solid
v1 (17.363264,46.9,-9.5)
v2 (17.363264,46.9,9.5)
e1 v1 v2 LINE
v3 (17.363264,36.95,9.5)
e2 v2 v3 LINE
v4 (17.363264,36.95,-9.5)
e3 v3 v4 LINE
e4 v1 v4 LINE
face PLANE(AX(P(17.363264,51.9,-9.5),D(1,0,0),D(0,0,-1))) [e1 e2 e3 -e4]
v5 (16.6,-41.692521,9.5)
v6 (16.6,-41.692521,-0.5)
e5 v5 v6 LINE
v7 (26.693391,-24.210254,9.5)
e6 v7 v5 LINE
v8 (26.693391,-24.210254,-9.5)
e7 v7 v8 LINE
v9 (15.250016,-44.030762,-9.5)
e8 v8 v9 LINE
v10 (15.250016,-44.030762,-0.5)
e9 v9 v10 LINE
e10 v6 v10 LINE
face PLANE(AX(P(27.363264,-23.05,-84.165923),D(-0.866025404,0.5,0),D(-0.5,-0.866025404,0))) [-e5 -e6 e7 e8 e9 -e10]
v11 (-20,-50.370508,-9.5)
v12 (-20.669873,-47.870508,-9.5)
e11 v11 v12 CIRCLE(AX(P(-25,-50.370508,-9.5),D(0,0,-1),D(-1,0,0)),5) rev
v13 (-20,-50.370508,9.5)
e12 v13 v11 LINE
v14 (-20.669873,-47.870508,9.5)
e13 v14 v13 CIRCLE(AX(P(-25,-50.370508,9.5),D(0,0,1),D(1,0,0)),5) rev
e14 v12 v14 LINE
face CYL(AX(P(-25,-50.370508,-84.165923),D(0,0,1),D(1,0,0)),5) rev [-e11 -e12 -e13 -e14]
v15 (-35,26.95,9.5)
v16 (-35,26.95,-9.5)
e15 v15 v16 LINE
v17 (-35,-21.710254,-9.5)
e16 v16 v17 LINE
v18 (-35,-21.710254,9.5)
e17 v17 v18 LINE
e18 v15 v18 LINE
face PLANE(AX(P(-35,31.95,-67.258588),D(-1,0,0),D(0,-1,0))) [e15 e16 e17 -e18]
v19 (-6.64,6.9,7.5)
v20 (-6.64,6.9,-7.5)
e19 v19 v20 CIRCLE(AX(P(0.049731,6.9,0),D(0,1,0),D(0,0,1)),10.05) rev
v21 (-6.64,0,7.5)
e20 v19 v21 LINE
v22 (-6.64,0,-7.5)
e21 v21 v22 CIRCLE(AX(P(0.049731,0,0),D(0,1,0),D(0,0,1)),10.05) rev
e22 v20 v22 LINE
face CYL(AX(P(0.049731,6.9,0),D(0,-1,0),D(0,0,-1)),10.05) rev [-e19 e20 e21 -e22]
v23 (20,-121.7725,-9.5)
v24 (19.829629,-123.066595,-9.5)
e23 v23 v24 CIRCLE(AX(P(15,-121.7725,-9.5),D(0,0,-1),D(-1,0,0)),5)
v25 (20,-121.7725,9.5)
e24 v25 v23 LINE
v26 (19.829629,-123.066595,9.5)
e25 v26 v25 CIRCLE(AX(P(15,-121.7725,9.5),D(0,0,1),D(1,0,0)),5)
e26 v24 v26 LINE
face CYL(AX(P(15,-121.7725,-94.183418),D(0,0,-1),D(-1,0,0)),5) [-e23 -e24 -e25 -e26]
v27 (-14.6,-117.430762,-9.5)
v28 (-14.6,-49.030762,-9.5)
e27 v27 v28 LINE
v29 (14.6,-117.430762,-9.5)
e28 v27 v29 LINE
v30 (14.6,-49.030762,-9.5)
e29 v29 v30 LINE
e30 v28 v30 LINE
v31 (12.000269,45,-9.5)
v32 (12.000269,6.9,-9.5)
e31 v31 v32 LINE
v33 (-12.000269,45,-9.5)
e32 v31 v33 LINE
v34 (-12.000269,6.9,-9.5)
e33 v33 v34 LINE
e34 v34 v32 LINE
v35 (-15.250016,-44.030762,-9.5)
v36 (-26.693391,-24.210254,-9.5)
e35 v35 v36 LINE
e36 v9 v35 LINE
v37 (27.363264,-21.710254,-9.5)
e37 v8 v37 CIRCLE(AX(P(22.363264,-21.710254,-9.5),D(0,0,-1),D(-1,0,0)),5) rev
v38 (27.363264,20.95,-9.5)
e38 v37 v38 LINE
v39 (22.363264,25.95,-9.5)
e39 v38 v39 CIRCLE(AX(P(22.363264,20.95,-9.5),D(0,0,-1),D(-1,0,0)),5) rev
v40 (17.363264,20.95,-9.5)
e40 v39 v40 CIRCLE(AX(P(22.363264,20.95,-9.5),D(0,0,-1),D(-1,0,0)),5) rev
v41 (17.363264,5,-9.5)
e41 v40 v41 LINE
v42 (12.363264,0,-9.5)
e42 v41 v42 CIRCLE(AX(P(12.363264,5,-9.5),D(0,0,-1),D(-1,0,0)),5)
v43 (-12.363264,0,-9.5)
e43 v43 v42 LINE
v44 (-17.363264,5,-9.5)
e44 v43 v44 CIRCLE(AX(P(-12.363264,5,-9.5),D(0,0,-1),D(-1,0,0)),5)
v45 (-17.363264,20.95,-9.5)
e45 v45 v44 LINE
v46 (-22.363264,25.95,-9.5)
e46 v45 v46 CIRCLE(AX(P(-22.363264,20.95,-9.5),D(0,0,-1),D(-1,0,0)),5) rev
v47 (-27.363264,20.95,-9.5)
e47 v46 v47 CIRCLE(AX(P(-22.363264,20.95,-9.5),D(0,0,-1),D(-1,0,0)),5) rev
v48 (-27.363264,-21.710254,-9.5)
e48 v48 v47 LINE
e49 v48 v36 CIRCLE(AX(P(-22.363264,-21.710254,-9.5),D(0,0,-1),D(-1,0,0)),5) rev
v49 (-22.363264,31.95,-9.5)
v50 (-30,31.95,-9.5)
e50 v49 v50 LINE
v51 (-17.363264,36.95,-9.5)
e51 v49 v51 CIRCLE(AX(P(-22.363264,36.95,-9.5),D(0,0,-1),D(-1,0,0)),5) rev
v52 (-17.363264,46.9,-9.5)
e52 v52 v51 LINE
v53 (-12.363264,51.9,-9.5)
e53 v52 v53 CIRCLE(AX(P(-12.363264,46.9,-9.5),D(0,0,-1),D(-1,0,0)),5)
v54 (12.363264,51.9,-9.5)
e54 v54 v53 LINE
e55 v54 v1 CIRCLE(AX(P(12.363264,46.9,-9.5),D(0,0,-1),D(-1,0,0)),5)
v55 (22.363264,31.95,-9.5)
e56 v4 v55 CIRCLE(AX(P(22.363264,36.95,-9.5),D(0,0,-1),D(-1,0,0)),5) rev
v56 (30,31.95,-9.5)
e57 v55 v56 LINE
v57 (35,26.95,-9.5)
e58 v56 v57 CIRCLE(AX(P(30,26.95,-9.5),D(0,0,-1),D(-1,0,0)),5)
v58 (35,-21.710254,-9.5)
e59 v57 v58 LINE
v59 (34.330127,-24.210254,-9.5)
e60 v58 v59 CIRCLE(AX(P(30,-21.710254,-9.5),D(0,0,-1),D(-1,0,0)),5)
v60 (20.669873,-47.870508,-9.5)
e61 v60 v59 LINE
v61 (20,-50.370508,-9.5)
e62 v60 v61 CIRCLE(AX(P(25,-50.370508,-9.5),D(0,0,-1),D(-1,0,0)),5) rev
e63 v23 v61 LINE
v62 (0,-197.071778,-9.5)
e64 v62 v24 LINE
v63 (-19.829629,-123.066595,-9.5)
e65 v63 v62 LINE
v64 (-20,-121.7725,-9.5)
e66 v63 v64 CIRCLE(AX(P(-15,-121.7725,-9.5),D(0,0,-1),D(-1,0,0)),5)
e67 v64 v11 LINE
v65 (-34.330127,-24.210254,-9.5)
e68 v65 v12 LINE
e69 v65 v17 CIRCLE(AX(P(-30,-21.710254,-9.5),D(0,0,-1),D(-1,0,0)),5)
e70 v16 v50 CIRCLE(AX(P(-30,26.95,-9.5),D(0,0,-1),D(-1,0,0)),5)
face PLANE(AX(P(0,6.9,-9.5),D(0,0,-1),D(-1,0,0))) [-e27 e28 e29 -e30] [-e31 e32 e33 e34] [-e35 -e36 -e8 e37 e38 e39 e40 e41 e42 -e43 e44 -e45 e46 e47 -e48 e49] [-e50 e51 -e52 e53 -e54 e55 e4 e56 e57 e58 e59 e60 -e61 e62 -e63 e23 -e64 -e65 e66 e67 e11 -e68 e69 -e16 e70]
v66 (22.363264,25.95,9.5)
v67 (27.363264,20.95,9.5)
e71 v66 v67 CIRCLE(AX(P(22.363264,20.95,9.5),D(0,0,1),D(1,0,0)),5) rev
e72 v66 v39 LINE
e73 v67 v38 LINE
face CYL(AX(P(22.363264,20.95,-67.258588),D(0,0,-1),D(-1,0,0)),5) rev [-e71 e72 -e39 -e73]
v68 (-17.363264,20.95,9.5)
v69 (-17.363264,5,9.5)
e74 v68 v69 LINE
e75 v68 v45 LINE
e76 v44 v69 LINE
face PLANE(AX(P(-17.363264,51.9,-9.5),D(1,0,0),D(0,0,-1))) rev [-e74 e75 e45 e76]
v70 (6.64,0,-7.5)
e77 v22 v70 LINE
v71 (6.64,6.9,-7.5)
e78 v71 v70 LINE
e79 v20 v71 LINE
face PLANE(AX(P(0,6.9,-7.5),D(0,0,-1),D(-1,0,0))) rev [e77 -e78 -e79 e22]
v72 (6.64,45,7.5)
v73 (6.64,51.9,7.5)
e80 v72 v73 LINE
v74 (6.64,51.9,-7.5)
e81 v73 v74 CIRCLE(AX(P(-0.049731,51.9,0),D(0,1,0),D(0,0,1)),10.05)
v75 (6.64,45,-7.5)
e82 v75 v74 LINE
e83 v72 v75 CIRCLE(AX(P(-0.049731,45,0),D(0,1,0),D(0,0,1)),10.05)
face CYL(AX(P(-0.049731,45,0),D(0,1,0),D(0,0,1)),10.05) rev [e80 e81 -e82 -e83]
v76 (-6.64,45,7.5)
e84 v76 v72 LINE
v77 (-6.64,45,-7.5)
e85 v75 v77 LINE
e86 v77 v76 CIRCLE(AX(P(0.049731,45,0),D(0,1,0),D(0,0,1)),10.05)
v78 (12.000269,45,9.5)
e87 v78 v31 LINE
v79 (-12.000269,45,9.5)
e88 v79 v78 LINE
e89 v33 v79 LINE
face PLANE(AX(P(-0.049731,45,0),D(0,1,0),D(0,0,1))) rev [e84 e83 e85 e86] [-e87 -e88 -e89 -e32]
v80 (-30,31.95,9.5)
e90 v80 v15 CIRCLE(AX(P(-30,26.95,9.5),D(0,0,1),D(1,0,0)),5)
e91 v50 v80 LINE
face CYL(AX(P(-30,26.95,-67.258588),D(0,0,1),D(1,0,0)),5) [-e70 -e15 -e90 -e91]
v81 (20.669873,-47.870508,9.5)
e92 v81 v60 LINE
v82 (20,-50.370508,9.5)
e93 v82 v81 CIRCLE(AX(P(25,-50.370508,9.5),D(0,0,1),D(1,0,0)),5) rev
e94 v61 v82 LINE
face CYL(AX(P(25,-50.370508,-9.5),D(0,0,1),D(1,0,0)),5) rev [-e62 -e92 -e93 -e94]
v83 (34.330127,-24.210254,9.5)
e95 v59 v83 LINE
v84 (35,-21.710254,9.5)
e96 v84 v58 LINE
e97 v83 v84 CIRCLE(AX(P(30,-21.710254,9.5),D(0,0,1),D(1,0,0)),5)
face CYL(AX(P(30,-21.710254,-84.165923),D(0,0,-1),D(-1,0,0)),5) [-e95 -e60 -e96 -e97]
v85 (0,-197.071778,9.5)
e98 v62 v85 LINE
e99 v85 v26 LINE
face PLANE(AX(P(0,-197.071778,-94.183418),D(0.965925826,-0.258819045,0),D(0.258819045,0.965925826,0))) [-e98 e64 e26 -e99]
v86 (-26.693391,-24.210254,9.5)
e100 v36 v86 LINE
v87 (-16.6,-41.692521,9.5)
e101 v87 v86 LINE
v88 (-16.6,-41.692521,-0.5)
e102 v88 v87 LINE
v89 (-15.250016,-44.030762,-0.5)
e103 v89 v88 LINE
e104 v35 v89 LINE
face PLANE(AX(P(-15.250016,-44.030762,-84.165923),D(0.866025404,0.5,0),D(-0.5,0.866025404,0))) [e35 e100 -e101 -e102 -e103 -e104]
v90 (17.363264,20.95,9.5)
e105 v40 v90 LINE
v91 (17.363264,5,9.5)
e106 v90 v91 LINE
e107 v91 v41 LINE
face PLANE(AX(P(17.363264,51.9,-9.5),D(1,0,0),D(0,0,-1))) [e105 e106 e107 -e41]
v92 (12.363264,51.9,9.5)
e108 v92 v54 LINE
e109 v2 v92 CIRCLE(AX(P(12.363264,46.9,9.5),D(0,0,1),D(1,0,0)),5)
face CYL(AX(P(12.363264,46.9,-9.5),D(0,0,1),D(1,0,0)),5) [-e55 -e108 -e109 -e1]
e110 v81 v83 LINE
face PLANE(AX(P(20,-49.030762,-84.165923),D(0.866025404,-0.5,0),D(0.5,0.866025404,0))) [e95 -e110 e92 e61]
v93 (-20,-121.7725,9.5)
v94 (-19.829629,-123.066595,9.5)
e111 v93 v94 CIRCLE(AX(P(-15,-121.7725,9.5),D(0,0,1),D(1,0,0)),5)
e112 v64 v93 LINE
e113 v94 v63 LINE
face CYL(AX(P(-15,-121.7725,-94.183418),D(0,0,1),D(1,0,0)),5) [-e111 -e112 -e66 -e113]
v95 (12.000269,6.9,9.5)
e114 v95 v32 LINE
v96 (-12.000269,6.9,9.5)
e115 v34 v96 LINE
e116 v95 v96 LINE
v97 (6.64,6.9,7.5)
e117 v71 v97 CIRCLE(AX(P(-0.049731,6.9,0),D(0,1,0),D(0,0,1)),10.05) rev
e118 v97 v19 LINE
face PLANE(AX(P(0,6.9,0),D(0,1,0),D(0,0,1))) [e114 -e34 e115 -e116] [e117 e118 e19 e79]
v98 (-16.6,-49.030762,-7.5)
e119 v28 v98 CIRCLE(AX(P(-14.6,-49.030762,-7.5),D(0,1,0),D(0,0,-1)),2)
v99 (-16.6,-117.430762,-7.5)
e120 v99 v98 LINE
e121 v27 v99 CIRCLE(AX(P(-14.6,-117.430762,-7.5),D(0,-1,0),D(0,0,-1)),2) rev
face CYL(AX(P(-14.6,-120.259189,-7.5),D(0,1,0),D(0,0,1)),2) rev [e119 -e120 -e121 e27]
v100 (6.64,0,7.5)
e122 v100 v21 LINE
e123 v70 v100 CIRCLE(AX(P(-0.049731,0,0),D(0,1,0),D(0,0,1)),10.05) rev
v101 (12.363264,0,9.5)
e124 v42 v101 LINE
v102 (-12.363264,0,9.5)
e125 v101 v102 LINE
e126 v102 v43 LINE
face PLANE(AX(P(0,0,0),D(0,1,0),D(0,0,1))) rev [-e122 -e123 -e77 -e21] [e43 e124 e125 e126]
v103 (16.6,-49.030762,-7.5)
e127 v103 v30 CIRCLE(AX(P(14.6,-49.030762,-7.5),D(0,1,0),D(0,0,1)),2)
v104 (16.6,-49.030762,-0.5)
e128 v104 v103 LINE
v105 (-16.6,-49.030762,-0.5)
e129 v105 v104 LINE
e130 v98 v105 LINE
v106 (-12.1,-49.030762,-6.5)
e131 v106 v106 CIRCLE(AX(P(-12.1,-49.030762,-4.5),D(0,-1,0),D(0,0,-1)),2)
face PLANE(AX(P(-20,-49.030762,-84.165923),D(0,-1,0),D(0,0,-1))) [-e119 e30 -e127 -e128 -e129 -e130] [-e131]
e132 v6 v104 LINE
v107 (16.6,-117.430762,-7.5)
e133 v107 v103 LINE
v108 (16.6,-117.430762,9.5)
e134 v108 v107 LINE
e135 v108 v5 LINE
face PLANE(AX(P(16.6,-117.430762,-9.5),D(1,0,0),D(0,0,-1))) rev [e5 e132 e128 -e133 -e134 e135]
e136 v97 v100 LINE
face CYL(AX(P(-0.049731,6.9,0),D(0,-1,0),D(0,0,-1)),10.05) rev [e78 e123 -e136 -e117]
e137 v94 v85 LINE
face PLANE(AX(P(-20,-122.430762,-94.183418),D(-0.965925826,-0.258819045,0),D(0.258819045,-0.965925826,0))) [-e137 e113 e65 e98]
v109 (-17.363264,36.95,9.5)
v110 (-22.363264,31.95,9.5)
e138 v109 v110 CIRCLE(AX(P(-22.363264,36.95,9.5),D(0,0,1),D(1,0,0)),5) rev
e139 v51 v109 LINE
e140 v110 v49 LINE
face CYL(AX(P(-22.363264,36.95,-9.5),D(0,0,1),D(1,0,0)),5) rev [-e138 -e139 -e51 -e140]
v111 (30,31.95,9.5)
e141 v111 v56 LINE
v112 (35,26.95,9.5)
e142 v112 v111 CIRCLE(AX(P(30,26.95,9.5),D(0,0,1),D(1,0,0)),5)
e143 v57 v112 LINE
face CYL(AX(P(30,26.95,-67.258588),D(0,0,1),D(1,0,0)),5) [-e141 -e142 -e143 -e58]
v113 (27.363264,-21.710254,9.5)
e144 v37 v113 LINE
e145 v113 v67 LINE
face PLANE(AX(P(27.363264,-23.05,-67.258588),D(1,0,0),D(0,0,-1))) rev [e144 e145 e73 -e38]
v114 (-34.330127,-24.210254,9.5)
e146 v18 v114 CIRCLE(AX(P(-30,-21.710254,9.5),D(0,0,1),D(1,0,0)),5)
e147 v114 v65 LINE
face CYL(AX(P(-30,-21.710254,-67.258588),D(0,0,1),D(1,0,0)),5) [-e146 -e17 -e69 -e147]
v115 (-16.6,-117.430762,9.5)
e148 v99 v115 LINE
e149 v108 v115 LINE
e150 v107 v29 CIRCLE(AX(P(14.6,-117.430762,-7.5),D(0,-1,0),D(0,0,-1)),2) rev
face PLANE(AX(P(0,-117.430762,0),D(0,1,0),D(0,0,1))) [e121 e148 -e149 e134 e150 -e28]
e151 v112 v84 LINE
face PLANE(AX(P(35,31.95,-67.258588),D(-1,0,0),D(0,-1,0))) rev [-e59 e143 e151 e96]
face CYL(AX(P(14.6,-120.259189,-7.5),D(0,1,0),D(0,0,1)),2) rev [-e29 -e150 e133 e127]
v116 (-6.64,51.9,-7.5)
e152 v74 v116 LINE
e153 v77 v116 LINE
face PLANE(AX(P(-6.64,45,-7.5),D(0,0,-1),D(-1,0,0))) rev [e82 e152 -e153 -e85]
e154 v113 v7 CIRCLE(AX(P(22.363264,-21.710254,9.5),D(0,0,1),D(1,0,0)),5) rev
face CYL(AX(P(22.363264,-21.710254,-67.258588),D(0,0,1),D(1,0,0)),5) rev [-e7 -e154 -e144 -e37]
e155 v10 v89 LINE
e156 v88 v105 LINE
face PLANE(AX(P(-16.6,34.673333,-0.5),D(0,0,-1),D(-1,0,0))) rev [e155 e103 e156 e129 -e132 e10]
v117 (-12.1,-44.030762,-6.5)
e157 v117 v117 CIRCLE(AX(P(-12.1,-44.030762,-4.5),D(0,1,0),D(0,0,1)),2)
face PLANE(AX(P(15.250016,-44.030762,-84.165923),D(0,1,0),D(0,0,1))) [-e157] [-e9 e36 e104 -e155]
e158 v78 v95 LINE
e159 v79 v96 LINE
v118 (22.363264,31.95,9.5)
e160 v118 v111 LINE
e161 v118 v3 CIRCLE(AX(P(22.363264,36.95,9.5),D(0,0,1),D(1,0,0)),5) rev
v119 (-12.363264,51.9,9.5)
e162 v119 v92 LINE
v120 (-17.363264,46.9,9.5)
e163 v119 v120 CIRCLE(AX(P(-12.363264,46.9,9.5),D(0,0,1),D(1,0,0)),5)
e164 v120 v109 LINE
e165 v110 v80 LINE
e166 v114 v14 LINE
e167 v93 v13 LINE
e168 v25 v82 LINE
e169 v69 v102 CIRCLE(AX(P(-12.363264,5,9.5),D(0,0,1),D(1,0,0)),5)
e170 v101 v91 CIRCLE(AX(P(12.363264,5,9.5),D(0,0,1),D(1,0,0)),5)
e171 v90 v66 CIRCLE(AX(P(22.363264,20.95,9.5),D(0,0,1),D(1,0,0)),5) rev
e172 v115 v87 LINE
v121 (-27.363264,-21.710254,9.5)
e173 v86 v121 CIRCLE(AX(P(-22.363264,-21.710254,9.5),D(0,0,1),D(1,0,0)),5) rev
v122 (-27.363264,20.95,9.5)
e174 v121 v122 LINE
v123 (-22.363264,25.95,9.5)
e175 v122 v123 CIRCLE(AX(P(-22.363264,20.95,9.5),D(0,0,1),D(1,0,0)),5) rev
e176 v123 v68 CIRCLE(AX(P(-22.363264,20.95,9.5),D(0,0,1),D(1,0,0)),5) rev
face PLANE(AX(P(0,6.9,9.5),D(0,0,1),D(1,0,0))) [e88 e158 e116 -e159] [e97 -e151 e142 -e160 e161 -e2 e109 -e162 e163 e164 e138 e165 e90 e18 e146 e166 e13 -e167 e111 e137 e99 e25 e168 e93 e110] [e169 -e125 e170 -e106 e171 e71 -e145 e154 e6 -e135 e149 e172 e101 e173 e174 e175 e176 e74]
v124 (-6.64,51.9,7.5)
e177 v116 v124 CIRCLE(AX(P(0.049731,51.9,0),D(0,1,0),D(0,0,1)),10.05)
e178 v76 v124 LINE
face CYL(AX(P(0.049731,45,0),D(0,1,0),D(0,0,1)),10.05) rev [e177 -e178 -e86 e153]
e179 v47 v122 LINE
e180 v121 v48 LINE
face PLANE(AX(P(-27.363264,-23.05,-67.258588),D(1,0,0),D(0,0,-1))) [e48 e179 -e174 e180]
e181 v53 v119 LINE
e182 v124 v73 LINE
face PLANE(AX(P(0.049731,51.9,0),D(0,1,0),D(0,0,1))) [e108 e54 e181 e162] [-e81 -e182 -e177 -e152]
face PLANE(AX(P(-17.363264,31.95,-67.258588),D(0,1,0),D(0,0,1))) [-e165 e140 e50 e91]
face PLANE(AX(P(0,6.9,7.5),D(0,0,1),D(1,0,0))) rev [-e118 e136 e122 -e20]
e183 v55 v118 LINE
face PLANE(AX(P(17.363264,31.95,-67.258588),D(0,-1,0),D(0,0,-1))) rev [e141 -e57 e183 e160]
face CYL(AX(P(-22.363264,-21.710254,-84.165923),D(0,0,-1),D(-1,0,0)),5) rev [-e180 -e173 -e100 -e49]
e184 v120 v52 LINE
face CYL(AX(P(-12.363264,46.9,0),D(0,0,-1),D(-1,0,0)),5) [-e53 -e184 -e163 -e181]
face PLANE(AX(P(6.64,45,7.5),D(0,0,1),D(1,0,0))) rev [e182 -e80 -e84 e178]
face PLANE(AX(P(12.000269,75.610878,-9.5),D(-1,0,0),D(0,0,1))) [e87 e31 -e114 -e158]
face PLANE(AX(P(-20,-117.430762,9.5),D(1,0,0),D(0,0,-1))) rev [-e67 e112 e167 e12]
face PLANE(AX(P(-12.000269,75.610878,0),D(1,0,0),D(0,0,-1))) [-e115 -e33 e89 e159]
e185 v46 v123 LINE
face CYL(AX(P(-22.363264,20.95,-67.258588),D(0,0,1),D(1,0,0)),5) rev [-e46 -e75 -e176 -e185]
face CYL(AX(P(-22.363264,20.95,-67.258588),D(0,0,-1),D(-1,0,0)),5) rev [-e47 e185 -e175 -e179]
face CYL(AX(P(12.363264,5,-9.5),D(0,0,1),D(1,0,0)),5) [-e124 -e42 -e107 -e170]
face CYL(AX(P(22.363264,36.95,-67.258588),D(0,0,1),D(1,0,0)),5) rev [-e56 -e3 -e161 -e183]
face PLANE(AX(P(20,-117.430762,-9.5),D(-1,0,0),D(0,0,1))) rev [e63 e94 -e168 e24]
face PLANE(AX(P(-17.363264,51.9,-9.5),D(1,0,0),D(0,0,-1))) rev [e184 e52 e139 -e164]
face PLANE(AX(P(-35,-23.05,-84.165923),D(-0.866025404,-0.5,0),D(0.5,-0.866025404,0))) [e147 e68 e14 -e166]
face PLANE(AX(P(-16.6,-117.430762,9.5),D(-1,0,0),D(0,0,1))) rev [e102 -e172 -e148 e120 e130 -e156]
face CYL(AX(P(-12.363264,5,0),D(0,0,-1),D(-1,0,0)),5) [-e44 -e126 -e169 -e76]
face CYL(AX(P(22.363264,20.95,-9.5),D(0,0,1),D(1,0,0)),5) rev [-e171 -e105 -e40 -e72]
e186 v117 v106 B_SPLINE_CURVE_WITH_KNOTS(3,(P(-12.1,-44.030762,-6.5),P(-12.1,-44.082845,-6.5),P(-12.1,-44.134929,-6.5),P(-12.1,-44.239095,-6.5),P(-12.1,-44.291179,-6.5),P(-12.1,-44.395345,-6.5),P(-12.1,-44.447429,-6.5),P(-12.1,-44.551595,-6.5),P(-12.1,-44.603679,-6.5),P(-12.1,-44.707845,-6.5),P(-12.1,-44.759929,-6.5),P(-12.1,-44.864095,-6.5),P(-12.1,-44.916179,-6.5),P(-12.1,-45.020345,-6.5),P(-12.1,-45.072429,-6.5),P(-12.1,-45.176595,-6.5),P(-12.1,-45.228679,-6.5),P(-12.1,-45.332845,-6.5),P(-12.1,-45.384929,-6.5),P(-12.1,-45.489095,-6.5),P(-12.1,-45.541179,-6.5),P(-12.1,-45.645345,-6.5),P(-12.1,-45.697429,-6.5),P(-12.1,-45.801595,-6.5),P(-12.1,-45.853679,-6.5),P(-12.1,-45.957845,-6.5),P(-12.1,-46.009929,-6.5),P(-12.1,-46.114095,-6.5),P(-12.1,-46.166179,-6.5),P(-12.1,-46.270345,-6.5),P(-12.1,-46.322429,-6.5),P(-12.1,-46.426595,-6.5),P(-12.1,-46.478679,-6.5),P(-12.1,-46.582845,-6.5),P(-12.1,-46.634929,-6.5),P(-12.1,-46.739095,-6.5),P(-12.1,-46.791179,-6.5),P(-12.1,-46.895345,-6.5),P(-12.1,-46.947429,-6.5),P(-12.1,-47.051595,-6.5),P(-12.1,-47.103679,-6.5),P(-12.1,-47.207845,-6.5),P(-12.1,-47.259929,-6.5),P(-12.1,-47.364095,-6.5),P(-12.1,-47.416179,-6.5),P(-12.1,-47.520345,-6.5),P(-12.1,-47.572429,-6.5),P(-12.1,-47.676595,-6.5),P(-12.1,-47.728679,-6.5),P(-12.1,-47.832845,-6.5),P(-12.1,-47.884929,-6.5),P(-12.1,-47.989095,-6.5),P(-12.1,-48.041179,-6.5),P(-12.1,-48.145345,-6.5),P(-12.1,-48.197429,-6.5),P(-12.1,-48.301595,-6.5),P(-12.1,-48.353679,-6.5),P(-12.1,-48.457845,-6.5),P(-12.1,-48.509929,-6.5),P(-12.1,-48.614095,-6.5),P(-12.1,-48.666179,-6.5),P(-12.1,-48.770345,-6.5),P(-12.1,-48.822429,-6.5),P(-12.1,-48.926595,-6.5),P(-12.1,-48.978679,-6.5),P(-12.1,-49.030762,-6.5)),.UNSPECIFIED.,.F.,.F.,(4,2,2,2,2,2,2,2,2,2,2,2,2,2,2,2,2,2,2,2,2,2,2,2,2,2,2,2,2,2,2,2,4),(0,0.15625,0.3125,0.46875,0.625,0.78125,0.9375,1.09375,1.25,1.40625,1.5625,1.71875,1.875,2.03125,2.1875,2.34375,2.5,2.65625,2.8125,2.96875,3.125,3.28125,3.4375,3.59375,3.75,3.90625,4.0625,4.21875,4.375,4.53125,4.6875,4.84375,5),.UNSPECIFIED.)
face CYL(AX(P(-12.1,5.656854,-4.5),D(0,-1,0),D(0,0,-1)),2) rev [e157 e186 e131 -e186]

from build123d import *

# Parameters (mm, degrees)
BOSS_EXTRUDE1_DEPTH  = 6.9
BOSS_EXTRUDE2_START  = -6.9
BOSS_EXTRUDE2_DEPTH  = 51.9
CUT_EXTRUDE1_DEPTH   = 50.160278182
BOSS_EXTRUDE4_START  = -6.9
BOSS_EXTRUDE4_DEPTH  = 6.9
BOSS_EXTRUDE5_DEPTH  = 19
BOSS_EXTRUDE8_DEPTH  = 19
CUT_EXTRUDE2_DEPTH   = 38.1
SKETCH16_W           = 3.4
SKETCH16_H           = 19
BOSS_EXTRUDE10_DEPTH = 68.4
BOSS_EXTRUDE11_DEPTH = 68.4
SKETCH18_W           = 40
SKETCH18_H           = 19
BOSS_EXTRUDE12_DEPTH = 5
CUT_EXTRUDE3_START   = -7.338241
SKETCH20_W           = 33.2
SKETCH20_H           = 10
CUT_EXTRUDE3_DEPTH   = 7.338241
BOSS_EXTRUDE13_DEPTH = 19
FILLET1_R            = 5
SKETCH22_R           = 2
CUT_EXTRUDE4_DEPTH   = 49.030762114


with BuildPart() as part:
    # Sketch1 → Boss-Extrude1 (new body)
    with BuildSketch(Plane(origin=(0, 0, 0), x_dir=(1, 0, 0), z_dir=(0, 1, 0))):
        with BuildLine():
            ThreePointArc((7.36326441, 9.5), (12.000269064, 0), (7.36326441, -9.5))
            Line((7.36326441, -9.5), (0, -9.5))
            Line((0, -9.5), (-7.36326441, -9.5))
            ThreePointArc((-7.36326441, -9.5), (-12.000269064, 0), (-7.36326441, 9.5))
            Line((-7.36326441, 9.5), (0, 9.5))
            Line((0, 9.5), (7.36326441, 9.5))
        make_face()
        with BuildLine():
            Line((0, 7.5), (6.64, 7.5))
            ThreePointArc((6.64, 7.5), (10.000269064, 0), (6.64, -7.5))
            Line((6.64, -7.5), (0, -7.5))
            Line((0, -7.5), (-6.64, -7.5))
            ThreePointArc((-6.64, -7.5), (-10.000269064, 0), (-6.64, 7.5))
            Line((-6.64, 7.5), (0, 7.5))
        make_face(mode=Mode.SUBTRACT)
    extrude(amount=BOSS_EXTRUDE1_DEPTH)

    # Sketch2 → Boss-Extrude2 (add)
    with BuildSketch(Plane(origin=(0, 6.9, 0), x_dir=(1, 0, 0), z_dir=(0, 1, 0)).offset(BOSS_EXTRUDE2_START)):
        with BuildLine():
            Line((-7.36326441, 9.5), (-17.36326441, 9.5))
            Line((-17.36326441, 9.5), (-17.36326441, -9.5))
            Line((-17.36326441, -9.5), (-7.36326441, -9.5))
            ThreePointArc((-7.36326441, -9.5), (-12.000269064, 0), (-7.36326441, 9.5))
        make_face()
    boss_extrude2 = extrude(amount=BOSS_EXTRUDE2_DEPTH)

    # Sketch4 → Cut-Extrude1 (cut, through all)
    with BuildSketch(Plane(origin=(0, 6.9, 0), x_dir=(1, 0, 0), z_dir=(0, 1, 0))):
        with BuildLine():
            Line((-10.915369405, -4.996906494), (-8.86326441, -9.5))
            Line((-8.86326441, -9.5), (-7.36326441, -9.5))
            ThreePointArc((-7.36326441, -9.5), (-9.411139164, -7.462870557), (-10.915369405, -4.996906494))
        make_face()
        with BuildLine():
            Line((-10.915369405, 4.996906494), (-8.86326441, 9.5))
            Line((-8.86326441, 9.5), (-7.36326441, 9.5))
            ThreePointArc((-7.36326441, 9.5), (-9.411139164, 7.462870557), (-10.915369405, 4.996906494))
        make_face()
    cut_extrude1 = extrude(amount=CUT_EXTRUDE1_DEPTH, mode=Mode.SUBTRACT)

    # Mirror2: Boss-Extrude2, Cut-Extrude1 across plane
    add(boss_extrude2.mirror(Plane(origin=(0, 0, 0), x_dir=(0, 0, 1), z_dir=(1, 0, 0))))
    add(cut_extrude1.mirror(Plane(origin=(0, 0, 0), x_dir=(0, 0, 1), z_dir=(1, 0, 0))), mode=Mode.SUBTRACT)

    # Sketch6 → Boss-Extrude4 (add)
    with BuildSketch(Plane(origin=(0, 51.9, 0), x_dir=(1, 0, 0), z_dir=(0, 1, 0)).offset(BOSS_EXTRUDE4_START)):
        with BuildLine():
            Line((10.915369405, 4.996906494), (8.86326441, 9.5))
            Line((8.86326441, 9.5), (-8.86326441, 9.5))
            Line((-8.86326441, 9.5), (-10.915369405, 4.996906494))
            ThreePointArc((-10.915369405, 4.996906494), (-12.000269064, 0), (-10.915369405, -4.996906494))
            Line((-10.915369405, -4.996906494), (-8.86326441, -9.5))
            Line((-8.86326441, -9.5), (8.86326441, -9.5))
            Line((8.86326441, -9.5), (10.915369405, -4.996906494))
            ThreePointArc((10.915369405, -4.996906494), (12.000269064, 0), (10.915369405, 4.996906494))
        make_face()
        with BuildLine():
            Line((-6.64, 7.5), (6.64, 7.5))
            ThreePointArc((6.64, 7.5), (10.000269064, 0), (6.64, -7.5))
            Line((6.64, -7.5), (-6.64, -7.5))
            ThreePointArc((-6.64, -7.5), (-10.000269064, 0), (-6.64, 7.5))
        make_face(mode=Mode.SUBTRACT)
    extrude(amount=BOSS_EXTRUDE4_DEPTH)

    # Sketch7 → Boss-Extrude5 (add)
    with BuildSketch(Plane.XY.offset(9.5)):
        Polygon((-17.36326441, 31.95), (-35, 31.95), (-35, -23.05), (-27.36326441, -23.05), (-27.36326441, 25.95), (-17.36326441, 25.95), align=None)
    boss_extrude5 = extrude(amount=-BOSS_EXTRUDE5_DEPTH)

    # Mirror4: Boss-Extrude5 across plane
    add(boss_extrude5.mirror(Plane(origin=(0, 0, 0), x_dir=(0, 0, 1), z_dir=(1, 0, 0))))

    # Sketch11 → Boss-Extrude8 (add)
    with BuildSketch(Plane.XY.offset(9.5)):
        Polygon((-35, -23.05), (-20, -49.030762114), (20, -49.030762114), (35, -23.05), (27.36326441, -23.05), (15.250015756, -44.030762114), (-15.250015756, -44.030762114), (-27.36326441, -23.05), align=None)
    extrude(amount=-BOSS_EXTRUDE8_DEPTH)

    # Sketch15 → Cut-Extrude2 (cut)
    with BuildSketch(Plane(origin=(0, 6.9, 0), x_dir=(1, 0, 0), z_dir=(0, 1, 0))):
        Polygon((-12.000269064, 0), (-12.000269064, 9.5), (12.000269064, 9.5), (12.000269064, 0), (12.000269064, -9.5), (-12.000269064, -9.5), align=None)
    extrude(amount=CUT_EXTRUDE2_DEPTH, mode=Mode.SUBTRACT)

    # Sketch16 → Boss-Extrude10 (add)
    with BuildSketch(Plane.XZ.offset(49.030762114)):
        with Locations((-18.3, 0)):
            Rectangle(SKETCH16_W, SKETCH16_H)
        with Locations((18.3, 0)):
            Rectangle(SKETCH16_W, SKETCH16_H)
    extrude(amount=BOSS_EXTRUDE10_DEPTH)

    # Sketch17 → Boss-Extrude11 (add)
    with BuildSketch(Plane.XZ.offset(49.030762114)):
        with BuildLine():
            Line((-14.6, -9.5), (-16.6, -9.5))
            Line((-16.6, -9.5), (-16.6, -7.5))
            ThreePointArc((-16.6, -7.5), (-16.014213562, -8.914213562), (-14.6, -9.5))
        make_face()
        with BuildLine():
            Line((14.6, -9.5), (16.6, -9.5))
            Line((16.6, -9.5), (16.6, -7.5))
            ThreePointArc((16.6, -7.5), (16.014213562, -8.914213562), (14.6, -9.5))
        make_face()
    extrude(amount=BOSS_EXTRUDE11_DEPTH)

    # Sketch18 → Boss-Extrude12 (add)
    with BuildSketch(Plane.XZ.offset(117.430762114)):
        Rectangle(SKETCH18_W, SKETCH18_H)
    extrude(amount=BOSS_EXTRUDE12_DEPTH)

    # Sketch20 → Cut-Extrude3 (cut)
    with BuildSketch(Plane.XZ.offset(49.030762114).offset(CUT_EXTRUDE3_START)):
        with Locations((0, 4.5)):
            Rectangle(SKETCH20_W, SKETCH20_H)
    extrude(amount=CUT_EXTRUDE3_DEPTH, mode=Mode.SUBTRACT)

    # Sketch21 → Boss-Extrude13 (add)
    with BuildSketch(Plane.XY.offset(9.5)):
        Polygon((-20, -122.430762114), (0, -197.071778265), (20, -122.430762114), align=None)
    extrude(amount=-BOSS_EXTRUDE13_DEPTH)

    # Fillet1
    fillet1_edges = [part.edges().sort_by_distance(p)[0] for p in [
        (20, -122.430762114, 0),
        (20, -49.030762114, 0),
        (35, -23.05, 0),
        (35, 31.95, 0),
        (17.36326441, 31.95, 0),
        (-17.36326441, 31.95, 0),
        (-35, 31.95, 0),
        (-35, -23.05, 0),
        (-20, -49.030762114, 0),
        (-20, -122.430762114, 0),
        (-17.36326441, 0, 0),
        (17.36326441, 25.95, 0),
        (17.36326441, 0, 0),
        (17.36326441, 51.9, 0),
        (-17.36326441, 25.95, 0),
        (-17.36326441, 51.9, 0),
        (-27.36326441, -23.05, 0),
        (27.36326441, -23.05, 0),
        (27.36326441, 25.95, 0),
        (-27.36326441, 25.95, 0),
    ]]
    fillet(fillet1_edges, radius=FILLET1_R - 0.0001)  # a hair under: the kernel refuses the full size

    # Sketch22 → Cut-Extrude4 (cut)
    with BuildSketch(Plane.XZ.offset(49.030762114)):
        with Locations(Location((-12.1, -4.5, 0), (0, 0, 270))):
            Circle(SKETCH22_R)
    extrude(amount=-CUT_EXTRUDE4_DEPTH, mode=Mode.SUBTRACT)


solid = part.part
